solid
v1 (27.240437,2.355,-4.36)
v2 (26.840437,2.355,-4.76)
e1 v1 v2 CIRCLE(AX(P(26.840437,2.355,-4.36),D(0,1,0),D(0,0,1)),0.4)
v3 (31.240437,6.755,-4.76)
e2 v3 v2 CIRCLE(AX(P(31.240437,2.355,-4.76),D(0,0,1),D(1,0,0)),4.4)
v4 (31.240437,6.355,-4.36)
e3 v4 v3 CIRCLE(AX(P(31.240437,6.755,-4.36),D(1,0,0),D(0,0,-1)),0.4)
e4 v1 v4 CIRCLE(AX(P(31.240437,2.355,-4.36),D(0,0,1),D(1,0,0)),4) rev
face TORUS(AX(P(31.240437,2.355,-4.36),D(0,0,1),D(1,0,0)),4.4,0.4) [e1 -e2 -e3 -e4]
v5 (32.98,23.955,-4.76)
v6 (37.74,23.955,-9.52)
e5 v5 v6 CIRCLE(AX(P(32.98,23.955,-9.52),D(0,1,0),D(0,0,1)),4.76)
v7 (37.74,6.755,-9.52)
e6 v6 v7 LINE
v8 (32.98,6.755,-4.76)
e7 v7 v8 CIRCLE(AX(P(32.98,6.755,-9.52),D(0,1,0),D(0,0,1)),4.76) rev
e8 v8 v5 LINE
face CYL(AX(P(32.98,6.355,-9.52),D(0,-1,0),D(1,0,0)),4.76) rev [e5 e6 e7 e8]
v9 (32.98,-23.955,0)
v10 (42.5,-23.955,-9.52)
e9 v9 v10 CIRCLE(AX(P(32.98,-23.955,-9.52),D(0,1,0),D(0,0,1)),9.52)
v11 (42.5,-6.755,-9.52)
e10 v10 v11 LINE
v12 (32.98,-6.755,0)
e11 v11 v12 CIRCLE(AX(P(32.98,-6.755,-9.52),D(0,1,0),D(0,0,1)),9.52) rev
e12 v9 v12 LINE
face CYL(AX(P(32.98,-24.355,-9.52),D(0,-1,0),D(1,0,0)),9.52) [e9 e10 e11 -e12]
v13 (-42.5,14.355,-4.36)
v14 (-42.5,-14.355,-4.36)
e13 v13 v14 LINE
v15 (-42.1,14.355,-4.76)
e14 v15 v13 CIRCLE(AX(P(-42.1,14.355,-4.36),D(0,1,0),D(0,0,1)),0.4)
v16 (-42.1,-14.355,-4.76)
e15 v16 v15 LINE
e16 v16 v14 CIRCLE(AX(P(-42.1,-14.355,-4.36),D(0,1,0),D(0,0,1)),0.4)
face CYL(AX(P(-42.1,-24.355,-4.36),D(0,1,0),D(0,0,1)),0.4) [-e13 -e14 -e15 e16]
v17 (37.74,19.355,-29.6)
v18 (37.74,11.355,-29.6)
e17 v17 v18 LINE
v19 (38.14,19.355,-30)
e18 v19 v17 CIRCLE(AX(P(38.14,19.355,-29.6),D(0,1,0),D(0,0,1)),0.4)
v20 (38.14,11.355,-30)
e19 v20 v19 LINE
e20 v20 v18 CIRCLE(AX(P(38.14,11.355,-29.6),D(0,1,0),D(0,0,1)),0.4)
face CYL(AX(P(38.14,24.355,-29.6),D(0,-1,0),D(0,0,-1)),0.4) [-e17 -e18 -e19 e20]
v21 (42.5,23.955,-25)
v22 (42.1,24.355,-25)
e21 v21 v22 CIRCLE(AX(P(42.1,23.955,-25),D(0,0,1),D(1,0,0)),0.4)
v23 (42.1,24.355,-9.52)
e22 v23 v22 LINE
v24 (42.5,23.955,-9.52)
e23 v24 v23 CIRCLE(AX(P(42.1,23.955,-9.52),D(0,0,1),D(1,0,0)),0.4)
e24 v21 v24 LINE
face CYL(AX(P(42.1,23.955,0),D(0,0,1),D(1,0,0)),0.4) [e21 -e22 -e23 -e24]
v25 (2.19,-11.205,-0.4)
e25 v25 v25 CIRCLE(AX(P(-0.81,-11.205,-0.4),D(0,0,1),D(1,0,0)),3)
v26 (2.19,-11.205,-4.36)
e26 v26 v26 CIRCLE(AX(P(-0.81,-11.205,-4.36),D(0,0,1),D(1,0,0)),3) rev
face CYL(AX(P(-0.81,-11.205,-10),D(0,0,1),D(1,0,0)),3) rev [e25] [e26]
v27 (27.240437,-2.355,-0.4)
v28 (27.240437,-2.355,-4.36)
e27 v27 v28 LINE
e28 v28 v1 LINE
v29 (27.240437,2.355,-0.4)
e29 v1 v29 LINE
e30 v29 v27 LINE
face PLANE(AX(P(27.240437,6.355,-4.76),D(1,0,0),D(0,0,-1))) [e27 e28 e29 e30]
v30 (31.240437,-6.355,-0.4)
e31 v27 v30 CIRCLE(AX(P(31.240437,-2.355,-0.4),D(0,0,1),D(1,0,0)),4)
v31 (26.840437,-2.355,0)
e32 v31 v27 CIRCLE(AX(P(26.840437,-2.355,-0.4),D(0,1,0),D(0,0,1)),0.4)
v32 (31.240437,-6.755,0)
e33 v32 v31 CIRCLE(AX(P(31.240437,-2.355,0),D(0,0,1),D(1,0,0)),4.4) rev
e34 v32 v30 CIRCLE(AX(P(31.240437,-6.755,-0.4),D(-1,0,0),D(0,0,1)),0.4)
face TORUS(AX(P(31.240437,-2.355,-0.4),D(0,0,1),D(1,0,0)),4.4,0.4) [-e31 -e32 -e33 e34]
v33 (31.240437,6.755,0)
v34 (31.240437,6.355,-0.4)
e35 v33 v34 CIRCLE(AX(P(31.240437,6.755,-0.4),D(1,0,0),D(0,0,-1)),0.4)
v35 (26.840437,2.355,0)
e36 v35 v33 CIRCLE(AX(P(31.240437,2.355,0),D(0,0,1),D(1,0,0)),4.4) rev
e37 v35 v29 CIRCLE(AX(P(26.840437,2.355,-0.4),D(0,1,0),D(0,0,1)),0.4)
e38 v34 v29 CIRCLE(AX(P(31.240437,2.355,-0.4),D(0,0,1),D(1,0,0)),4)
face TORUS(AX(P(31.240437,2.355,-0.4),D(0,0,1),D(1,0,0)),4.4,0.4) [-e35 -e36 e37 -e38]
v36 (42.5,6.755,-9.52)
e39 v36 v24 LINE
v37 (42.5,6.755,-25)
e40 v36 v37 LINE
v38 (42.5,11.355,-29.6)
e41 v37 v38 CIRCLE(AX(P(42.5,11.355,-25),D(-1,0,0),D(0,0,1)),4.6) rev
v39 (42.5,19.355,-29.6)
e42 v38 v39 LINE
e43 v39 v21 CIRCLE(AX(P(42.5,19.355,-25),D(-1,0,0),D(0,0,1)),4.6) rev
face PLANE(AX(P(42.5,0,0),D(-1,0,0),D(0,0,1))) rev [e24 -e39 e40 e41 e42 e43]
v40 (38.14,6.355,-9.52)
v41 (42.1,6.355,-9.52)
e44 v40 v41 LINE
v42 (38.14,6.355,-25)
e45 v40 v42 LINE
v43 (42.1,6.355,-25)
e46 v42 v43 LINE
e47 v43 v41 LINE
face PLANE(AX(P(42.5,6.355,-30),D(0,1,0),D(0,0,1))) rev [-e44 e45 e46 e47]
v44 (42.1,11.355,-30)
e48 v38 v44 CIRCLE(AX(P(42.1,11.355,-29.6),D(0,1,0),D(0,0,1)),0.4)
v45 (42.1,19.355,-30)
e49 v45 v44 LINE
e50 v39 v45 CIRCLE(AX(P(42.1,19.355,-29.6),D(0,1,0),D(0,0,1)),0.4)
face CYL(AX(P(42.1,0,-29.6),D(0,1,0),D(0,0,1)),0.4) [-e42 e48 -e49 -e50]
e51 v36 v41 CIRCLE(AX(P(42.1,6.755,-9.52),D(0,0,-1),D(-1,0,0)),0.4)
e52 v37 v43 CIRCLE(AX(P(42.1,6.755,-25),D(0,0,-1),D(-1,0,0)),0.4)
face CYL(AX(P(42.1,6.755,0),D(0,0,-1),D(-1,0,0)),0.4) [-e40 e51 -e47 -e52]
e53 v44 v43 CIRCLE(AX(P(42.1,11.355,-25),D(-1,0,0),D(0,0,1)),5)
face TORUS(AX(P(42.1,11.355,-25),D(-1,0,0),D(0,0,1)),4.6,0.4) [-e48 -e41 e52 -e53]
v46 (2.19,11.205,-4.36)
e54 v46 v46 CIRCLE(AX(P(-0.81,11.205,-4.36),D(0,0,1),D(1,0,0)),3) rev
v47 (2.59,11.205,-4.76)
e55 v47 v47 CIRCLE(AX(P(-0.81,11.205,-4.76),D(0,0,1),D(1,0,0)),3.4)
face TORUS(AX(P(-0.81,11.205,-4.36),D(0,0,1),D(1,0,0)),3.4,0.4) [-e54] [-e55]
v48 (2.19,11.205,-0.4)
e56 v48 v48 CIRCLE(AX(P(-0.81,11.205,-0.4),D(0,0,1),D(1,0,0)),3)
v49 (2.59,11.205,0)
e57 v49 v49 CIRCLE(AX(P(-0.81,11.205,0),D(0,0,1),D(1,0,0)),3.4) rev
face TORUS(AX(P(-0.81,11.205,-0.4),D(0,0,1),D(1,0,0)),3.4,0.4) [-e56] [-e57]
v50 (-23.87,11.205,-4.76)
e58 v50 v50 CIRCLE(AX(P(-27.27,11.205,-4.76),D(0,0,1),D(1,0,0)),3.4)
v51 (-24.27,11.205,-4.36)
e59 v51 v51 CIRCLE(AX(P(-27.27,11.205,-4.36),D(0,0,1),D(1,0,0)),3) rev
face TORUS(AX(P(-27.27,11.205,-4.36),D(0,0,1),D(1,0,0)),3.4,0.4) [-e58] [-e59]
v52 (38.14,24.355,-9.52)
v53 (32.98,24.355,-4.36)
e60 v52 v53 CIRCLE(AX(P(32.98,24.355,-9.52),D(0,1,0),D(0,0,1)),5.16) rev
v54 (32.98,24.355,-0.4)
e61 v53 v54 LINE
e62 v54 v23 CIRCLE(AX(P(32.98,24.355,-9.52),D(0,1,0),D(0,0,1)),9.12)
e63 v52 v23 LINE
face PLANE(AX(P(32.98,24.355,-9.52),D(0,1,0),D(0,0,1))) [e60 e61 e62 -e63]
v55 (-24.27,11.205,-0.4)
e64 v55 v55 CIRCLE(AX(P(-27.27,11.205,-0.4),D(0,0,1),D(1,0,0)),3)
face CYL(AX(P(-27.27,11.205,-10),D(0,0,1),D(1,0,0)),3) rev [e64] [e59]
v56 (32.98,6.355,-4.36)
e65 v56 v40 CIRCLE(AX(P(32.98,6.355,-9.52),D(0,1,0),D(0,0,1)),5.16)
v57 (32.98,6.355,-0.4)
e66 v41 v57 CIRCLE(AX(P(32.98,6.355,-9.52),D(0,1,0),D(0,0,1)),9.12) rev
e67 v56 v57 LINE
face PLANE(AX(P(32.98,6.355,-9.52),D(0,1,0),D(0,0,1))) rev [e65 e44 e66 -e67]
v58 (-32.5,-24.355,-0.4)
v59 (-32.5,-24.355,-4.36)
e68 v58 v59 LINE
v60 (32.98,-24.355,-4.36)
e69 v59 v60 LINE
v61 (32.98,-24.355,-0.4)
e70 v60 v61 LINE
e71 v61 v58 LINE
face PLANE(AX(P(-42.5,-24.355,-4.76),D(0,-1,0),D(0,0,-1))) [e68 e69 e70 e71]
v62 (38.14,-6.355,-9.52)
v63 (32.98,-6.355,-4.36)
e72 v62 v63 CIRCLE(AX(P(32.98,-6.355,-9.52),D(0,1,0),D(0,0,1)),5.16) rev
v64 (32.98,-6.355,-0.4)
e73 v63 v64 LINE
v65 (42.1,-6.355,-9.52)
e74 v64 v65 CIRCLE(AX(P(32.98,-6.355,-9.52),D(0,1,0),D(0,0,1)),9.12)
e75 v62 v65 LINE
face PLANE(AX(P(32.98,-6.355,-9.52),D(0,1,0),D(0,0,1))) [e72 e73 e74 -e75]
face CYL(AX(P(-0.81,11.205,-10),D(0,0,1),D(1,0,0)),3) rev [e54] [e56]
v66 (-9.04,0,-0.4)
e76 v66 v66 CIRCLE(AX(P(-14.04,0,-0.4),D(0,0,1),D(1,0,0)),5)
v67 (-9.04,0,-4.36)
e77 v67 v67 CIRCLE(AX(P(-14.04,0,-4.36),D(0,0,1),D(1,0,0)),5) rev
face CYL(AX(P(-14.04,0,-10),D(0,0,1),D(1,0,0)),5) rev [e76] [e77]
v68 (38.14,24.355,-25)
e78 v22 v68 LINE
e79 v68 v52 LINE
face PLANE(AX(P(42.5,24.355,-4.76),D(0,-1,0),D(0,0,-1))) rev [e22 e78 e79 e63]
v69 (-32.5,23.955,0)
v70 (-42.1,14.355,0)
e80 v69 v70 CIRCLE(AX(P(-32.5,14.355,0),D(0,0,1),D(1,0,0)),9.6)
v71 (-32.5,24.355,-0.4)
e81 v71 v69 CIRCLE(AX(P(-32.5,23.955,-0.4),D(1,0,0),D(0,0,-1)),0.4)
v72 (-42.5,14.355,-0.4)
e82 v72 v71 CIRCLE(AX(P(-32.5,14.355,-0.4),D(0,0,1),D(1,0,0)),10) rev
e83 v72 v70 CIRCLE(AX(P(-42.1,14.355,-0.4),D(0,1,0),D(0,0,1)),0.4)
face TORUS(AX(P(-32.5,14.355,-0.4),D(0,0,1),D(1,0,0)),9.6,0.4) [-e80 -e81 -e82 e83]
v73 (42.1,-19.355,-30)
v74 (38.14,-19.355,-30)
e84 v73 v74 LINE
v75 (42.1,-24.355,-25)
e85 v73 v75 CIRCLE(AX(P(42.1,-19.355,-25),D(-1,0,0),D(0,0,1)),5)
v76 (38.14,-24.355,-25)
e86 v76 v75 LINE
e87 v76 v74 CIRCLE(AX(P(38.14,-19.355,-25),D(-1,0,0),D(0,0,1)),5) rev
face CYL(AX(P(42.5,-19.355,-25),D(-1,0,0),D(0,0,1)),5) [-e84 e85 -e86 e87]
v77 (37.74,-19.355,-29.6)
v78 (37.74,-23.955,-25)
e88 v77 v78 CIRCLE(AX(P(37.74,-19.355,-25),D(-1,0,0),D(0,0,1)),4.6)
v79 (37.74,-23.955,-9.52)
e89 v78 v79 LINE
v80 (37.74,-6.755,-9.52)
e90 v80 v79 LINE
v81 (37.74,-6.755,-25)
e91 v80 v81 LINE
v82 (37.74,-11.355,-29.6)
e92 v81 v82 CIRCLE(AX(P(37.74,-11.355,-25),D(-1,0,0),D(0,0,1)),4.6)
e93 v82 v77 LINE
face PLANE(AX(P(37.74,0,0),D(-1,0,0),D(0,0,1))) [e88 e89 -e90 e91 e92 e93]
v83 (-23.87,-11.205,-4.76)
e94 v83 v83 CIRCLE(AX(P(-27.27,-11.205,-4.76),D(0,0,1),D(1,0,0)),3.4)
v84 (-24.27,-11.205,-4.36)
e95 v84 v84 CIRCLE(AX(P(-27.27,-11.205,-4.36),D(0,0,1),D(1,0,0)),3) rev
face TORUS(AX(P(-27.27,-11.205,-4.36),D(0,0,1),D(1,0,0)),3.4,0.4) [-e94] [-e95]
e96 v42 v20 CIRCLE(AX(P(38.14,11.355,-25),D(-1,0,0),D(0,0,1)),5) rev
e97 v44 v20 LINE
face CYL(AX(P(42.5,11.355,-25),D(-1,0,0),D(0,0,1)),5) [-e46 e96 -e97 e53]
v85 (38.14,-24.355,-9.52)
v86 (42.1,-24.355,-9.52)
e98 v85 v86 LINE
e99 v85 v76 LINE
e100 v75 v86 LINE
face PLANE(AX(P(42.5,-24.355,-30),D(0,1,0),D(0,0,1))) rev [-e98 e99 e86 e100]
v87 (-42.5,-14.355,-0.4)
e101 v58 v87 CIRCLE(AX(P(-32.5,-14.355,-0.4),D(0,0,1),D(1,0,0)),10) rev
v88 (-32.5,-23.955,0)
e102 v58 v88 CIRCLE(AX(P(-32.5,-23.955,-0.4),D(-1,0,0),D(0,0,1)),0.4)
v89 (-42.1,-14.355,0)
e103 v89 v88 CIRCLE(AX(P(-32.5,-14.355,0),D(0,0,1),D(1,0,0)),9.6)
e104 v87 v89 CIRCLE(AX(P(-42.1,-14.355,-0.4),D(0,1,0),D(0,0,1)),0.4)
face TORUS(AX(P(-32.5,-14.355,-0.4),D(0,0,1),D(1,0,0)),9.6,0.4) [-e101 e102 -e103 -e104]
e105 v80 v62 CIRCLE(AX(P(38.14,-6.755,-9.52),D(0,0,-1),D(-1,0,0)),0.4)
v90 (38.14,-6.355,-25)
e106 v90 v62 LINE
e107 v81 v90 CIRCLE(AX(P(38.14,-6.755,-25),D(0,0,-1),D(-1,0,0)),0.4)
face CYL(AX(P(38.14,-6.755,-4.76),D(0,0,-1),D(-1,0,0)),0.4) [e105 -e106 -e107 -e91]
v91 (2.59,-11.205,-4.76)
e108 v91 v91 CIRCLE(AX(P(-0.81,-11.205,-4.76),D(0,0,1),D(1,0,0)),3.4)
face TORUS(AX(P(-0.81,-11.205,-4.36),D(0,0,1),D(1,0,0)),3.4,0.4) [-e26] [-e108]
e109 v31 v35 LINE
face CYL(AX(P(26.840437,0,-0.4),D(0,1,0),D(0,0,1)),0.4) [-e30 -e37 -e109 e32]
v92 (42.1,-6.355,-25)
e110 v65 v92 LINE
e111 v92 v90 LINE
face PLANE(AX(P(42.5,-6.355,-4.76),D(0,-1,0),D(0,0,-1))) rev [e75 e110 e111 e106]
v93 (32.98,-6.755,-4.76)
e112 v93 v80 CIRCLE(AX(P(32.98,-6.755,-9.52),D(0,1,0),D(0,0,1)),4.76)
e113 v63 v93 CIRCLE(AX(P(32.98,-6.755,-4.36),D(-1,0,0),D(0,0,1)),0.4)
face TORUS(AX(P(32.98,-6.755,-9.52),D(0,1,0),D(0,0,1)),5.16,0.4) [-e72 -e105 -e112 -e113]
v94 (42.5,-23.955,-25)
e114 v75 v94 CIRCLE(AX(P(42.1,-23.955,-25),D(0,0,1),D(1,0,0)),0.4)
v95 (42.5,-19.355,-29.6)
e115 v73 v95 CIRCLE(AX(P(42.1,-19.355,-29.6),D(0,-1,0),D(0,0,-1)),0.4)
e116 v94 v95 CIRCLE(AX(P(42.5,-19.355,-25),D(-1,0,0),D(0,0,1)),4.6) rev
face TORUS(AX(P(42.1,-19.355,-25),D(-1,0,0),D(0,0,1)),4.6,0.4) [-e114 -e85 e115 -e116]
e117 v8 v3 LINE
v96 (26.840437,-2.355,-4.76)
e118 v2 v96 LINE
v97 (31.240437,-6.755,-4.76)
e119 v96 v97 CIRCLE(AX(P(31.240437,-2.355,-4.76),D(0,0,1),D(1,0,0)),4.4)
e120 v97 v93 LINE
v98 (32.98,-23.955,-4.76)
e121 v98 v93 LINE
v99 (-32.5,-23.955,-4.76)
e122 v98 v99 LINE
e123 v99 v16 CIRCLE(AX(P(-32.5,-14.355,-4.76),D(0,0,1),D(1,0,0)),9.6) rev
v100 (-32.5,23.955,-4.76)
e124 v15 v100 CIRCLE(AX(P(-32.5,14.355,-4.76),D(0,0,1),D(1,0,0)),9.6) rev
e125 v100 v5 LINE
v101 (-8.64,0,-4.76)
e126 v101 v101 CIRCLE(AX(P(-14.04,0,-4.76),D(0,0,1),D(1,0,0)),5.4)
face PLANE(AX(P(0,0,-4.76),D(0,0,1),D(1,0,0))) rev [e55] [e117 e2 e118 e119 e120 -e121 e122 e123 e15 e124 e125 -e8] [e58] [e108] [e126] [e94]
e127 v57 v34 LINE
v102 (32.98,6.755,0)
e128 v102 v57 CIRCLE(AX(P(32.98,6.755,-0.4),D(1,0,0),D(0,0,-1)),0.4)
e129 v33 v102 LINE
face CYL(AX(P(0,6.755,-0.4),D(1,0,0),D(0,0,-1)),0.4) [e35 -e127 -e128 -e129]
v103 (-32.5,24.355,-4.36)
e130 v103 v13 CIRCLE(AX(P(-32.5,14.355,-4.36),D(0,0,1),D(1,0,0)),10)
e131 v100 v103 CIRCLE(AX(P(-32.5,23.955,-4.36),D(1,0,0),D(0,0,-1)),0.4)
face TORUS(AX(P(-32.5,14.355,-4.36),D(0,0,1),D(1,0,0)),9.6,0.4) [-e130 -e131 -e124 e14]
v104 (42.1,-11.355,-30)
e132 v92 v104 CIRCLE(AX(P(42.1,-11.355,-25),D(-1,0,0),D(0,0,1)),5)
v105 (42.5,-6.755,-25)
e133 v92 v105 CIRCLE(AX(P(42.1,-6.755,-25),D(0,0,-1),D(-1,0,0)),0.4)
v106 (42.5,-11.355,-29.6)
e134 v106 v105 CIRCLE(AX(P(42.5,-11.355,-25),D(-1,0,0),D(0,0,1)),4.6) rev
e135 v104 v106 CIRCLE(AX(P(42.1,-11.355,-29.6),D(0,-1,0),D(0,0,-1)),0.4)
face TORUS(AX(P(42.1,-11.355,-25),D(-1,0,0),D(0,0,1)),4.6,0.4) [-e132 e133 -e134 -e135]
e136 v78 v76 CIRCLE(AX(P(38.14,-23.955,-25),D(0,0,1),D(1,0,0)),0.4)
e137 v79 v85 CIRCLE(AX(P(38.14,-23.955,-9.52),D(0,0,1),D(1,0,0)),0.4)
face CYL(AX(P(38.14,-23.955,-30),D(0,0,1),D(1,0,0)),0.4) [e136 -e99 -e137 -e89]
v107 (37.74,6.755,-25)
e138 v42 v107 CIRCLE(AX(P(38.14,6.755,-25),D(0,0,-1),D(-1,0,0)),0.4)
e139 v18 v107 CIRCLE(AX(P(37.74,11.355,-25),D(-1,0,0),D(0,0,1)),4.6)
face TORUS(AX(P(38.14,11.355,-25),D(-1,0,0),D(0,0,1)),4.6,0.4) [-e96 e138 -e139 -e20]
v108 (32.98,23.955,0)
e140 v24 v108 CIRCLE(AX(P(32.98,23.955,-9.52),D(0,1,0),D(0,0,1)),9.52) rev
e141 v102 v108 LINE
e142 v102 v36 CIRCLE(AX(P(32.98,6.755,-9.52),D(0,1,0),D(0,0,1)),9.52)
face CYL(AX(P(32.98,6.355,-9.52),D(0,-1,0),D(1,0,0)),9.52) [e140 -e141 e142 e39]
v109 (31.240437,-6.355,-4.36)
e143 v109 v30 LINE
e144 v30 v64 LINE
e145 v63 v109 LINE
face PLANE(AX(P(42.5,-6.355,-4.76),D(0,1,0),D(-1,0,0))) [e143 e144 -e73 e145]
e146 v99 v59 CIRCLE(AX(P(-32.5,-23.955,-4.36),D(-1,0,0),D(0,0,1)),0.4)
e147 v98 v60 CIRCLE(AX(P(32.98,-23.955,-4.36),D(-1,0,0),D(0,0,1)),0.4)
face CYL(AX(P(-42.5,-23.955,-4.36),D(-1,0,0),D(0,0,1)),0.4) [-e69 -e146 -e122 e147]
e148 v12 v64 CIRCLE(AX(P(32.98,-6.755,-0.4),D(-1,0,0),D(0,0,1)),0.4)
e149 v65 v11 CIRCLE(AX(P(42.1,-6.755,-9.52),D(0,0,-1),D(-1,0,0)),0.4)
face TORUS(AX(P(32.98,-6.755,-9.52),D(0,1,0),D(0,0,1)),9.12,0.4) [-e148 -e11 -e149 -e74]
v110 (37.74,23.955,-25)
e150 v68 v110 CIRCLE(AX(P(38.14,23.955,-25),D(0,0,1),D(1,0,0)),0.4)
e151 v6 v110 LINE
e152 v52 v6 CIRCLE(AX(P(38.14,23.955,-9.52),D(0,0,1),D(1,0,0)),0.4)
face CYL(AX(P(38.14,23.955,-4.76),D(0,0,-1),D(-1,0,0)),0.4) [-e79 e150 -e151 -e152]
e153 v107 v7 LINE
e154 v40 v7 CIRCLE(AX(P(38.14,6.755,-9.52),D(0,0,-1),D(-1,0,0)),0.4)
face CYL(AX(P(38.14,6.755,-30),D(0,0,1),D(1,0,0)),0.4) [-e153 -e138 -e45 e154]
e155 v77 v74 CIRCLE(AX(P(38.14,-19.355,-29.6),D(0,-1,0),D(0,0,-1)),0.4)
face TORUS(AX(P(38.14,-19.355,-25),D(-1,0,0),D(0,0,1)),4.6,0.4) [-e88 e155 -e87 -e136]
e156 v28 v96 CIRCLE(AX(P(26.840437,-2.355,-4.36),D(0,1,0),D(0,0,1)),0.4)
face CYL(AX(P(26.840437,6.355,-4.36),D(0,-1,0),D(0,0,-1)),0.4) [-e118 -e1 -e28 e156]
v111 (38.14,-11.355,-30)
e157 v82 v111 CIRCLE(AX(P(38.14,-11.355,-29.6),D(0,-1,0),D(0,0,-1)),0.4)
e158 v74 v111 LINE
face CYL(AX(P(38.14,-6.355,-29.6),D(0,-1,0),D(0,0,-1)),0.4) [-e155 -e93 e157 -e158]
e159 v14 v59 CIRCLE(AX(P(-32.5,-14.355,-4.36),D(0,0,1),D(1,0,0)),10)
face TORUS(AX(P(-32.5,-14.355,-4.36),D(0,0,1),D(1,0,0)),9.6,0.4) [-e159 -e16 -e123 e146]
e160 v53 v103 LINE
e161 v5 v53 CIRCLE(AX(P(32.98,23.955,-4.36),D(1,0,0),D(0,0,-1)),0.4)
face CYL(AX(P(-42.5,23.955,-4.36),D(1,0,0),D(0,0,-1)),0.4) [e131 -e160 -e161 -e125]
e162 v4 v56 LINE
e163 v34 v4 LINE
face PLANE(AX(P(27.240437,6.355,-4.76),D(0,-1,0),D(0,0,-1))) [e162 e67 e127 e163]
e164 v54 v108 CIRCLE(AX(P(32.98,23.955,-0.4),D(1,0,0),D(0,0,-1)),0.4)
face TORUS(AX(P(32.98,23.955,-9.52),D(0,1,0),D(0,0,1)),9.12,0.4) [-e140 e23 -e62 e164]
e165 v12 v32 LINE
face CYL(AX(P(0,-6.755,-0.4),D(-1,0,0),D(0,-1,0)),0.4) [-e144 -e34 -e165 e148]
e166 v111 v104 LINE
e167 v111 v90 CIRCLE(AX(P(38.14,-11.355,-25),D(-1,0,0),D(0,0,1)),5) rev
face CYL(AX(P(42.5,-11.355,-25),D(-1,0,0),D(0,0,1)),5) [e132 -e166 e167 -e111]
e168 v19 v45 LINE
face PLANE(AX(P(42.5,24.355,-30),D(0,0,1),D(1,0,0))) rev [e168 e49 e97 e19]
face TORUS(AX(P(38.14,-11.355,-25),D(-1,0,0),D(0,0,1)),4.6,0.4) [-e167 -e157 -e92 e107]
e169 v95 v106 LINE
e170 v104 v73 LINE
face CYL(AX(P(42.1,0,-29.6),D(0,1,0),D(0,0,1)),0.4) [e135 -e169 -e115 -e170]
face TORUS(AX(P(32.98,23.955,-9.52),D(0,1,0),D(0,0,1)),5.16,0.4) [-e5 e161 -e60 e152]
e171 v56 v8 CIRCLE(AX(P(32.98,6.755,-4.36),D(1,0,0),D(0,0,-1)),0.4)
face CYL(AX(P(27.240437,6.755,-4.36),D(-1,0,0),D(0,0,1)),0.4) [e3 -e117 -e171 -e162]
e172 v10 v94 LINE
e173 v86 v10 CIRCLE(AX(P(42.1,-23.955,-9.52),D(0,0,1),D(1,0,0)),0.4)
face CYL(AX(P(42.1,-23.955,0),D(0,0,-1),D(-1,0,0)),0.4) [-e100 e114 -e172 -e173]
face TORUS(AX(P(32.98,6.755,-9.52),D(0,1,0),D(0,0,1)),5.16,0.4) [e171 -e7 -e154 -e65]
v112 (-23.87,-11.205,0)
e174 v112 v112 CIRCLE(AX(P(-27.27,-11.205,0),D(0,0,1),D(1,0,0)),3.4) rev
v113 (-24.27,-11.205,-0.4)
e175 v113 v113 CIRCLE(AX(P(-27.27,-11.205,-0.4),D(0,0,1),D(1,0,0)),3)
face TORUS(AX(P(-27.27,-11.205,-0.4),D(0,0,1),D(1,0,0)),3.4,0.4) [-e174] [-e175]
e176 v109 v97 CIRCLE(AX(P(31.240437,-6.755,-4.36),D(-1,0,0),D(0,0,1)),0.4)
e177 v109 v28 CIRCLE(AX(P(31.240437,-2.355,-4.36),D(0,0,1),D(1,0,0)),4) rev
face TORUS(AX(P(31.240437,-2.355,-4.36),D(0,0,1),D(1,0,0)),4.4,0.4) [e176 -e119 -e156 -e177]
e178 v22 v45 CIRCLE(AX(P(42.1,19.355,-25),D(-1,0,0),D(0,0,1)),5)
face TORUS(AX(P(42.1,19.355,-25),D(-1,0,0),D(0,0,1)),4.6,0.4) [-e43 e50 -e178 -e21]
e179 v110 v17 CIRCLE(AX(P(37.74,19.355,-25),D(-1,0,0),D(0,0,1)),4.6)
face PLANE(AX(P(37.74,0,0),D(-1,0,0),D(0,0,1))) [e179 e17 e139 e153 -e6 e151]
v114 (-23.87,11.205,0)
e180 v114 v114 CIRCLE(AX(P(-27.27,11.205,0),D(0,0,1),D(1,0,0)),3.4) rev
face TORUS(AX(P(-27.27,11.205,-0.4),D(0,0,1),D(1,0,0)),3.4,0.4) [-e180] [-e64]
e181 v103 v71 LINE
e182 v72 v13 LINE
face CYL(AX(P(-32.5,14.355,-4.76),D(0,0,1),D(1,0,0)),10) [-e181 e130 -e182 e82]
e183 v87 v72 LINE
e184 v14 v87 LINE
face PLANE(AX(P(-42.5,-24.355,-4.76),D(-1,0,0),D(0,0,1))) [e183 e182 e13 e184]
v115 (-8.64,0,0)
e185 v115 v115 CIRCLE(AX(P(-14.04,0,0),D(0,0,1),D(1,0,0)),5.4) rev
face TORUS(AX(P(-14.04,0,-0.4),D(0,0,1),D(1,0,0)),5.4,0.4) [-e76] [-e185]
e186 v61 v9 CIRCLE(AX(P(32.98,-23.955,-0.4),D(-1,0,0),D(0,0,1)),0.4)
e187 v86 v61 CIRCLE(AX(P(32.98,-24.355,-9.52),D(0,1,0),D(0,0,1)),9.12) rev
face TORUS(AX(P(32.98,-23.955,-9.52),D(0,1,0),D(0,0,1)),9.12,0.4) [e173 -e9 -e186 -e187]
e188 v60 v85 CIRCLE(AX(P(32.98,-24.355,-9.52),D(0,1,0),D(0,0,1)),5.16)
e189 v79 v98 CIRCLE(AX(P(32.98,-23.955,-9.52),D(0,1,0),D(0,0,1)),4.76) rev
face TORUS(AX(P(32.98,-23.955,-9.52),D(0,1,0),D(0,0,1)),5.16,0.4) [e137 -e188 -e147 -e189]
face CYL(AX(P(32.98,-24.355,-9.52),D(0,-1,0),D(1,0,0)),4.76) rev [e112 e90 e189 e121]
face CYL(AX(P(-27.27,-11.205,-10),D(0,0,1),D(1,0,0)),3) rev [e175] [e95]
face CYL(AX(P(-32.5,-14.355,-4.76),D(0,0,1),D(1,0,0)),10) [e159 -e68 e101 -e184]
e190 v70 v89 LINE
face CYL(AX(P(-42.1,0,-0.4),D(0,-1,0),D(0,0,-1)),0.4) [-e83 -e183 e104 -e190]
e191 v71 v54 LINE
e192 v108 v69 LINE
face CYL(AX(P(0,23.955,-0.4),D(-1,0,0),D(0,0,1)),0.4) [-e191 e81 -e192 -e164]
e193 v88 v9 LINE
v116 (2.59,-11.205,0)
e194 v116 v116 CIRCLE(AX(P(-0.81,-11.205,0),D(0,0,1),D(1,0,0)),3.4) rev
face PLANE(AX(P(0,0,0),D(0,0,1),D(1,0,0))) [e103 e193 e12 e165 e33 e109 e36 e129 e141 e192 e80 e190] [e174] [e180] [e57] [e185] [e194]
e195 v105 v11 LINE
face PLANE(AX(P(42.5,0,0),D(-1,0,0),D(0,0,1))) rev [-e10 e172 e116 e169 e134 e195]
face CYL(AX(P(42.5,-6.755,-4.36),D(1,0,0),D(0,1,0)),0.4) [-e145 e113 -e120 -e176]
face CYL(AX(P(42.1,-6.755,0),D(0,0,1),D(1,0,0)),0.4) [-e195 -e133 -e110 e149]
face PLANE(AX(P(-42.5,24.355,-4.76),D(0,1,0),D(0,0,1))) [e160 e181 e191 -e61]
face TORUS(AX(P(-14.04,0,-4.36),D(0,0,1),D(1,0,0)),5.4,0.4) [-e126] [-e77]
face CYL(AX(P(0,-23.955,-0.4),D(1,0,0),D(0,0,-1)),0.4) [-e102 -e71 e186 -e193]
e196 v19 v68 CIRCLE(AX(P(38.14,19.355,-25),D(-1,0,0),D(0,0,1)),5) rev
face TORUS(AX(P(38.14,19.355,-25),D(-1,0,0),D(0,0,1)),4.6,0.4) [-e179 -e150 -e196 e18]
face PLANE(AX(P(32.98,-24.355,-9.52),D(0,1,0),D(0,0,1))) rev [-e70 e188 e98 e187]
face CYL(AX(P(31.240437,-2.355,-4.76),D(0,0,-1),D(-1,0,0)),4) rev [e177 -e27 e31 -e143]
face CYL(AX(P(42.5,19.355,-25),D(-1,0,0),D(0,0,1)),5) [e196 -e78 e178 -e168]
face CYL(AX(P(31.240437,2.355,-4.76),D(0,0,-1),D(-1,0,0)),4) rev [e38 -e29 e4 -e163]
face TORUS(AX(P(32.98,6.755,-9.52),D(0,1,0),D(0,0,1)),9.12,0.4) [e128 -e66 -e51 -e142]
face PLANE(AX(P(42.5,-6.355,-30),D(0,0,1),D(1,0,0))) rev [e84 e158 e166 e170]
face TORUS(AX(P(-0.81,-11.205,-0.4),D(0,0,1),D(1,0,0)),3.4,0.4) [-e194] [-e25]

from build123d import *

# Parameters (mm, degrees)
BASE_FLANGE2_DEPTH             = 4.76
FILLET1_R                      = 4
FILLET2_R                      = 10
EDGE_FLANGE1_STRIP_W           = 28.56
EDGE_FLANGE1_STRIP_H           = 4.76
EDGE_FLANGE1_STRIP_CUT_DEPTH   = 18
EDGE_FLANGE1_STRIP_2_W         = 28.56
EDGE_FLANGE1_STRIP_2_H         = 4.76
EDGE_FLANGE1_STRIP_CUT_2_DEPTH = 18
EDGE_FLANGE1_DEPTH             = 18
EDGE_FLANGE1_BEND_DEPTH        = 18
FILLET3_R                      = 5
SKETCH16_R                     = 3
SKETCH16_R_2                   = 5
CUT_EXTRUDE2_DEPTH             = 10
FILLET4_R                      = 0.4
FILLET5_R                      = 0.4


# Sheet-metal steps are written as plain solids
with BuildPart() as part:
    # Sketch1 → Base-Flange2 (new body)
    with BuildSketch(Plane.XY):
        Polygon((27.240436749, 6.355), (42.5, 6.355), (42.5, 24.355), (-42.5, 24.355), (-42.5, -24.355), (42.5, -24.355), (42.5, -6.355), (27.240436749, -6.355), align=None)
    extrude(amount=-BASE_FLANGE2_DEPTH)

    # Fillet1
    fillet1_edges = [part.edges().sort_by_distance(p)[0] for p in [
        (27.240436749, 6.355, -2.38),
        (27.240436749, -6.355, -2.38),
    ]]
    fillet(fillet1_edges, radius=FILLET1_R)

    # Fillet2
    fillet2_edges = [part.edges().sort_by_distance(p)[0] for p in [
        (-42.5, -24.355, -2.38),
        (-42.5, 24.355, -2.38),
    ]]
    fillet(fillet2_edges, radius=FILLET2_R)

    # Edge-Flange1 strip (across the edge) → Edge-Flange1 strip cut (cut)
    with BuildSketch(Plane(origin=(42.5, 24.355, -4.76), x_dir=(-1, 0, 0), z_dir=(0, -1, 0))):
        with Locations((-4.76, -2.38)):
            Rectangle(EDGE_FLANGE1_STRIP_W, EDGE_FLANGE1_STRIP_H)
    extrude(amount=EDGE_FLANGE1_STRIP_CUT_DEPTH, mode=Mode.SUBTRACT)

    # Edge-Flange1 strip 2 (across the edge) → Edge-Flange1 strip cut 2 (cut)
    with BuildSketch(Plane(origin=(42.5, -6.355, -4.76), x_dir=(-1, 0, 0), z_dir=(0, -1, 0))):
        with Locations((-4.76, -2.38)):
            Rectangle(EDGE_FLANGE1_STRIP_2_W, EDGE_FLANGE1_STRIP_2_H)
    extrude(amount=EDGE_FLANGE1_STRIP_CUT_2_DEPTH, mode=Mode.SUBTRACT)

    # Edge-Flange1 section (across the edge) → Edge-Flange1 (add)
    with BuildSketch(Plane(origin=(42.5, 24.355, -4.76), x_dir=(-1, 0, 0), z_dir=(0, -1, 0))):
        with BuildLine():
            Line((0, 4.76), (0, 25.24))
            Line((0, 25.24), (4.76, 25.24))
            Line((4.76, 25.24), (4.76, 4.76))
            ThreePointArc((4.76, 4.76), (6.154171722, 1.394171722), (9.52, 0))
            Line((9.52, 0), (9.52, -4.76))
            ThreePointArc((9.52, -4.76), (2.788343443, -1.971656557), (0, 4.76))
        make_face()
    extrude(amount=EDGE_FLANGE1_DEPTH)

    # Edge-Flange1 section 2 (across the edge) → Edge-Flange1 bend (add)
    with BuildSketch(Plane(origin=(42.5, -6.355, -4.76), x_dir=(-1, 0, 0), z_dir=(0, -1, 0))):
        with BuildLine():
            Line((0, 4.76), (0, 25.24))
            Line((0, 25.24), (4.76, 25.24))
            Line((4.76, 25.24), (4.76, 4.76))
            ThreePointArc((4.76, 4.76), (6.154171722, 1.394171722), (9.52, 0))
            Line((9.52, 0), (9.52, -4.76))
            ThreePointArc((9.52, -4.76), (2.788343443, -1.971656557), (0, 4.76))
        make_face()
    extrude(amount=EDGE_FLANGE1_BEND_DEPTH)

    # Fillet3
    fillet3_edges = [part.edges().sort_by_distance(p)[0] for p in [
        (40.12, -6.355, -30),
        (40.12, -24.355, -30),
        (40.12, 24.355, -30),
        (40.12, 6.355, -30),
    ]]
    fillet(fillet3_edges, radius=FILLET3_R)

    # Sketch16 → Cut-Extrude2 (cut)
    with BuildSketch(Plane.XY):
        with BuildLine():
            Line((-27.27, 8.205), (-27.27, 11.205))
            Line((-27.27, 11.205), (-24.27, 11.205))
            ThreePointArc((-24.27, 11.205), (-29.391320344, 13.326320344), (-27.27, 8.205))
        make_face()
        with BuildLine():
            Line((-24.27, 11.205), (-27.27, 11.205))
            Line((-27.27, 11.205), (-27.27, 8.205))
            ThreePointArc((-27.27, 8.205), (-25.148679656, 9.083679656), (-24.27, 11.205))
        make_face()
        with Locations((-0.81, 11.205)):
            Circle(SKETCH16_R)
        with Locations((-0.81, -11.205)):
            Circle(SKETCH16_R)
        with Locations((-27.27, -11.205)):
            Circle(SKETCH16_R)
        with Locations((-14.04, 0)):
            Circle(SKETCH16_R_2)
    extrude(amount=-CUT_EXTRUDE2_DEPTH, mode=Mode.SUBTRACT)

    # Fillet4
    fillet4_edges = [part.edges().sort_by_distance(p)[0] for p in [
        (-19.04, 0, -4.76),
        (-19.04, 0, 0),
        (-30.27, -11.205, 0),
        (-30.27, -11.205, -4.76),
        (-3.81, -11.205, -4.76),
        (-3.81, -11.205, 0),
        (-3.81, 11.205, 0),
        (-3.81, 11.205, -4.76),
        (-27.27, 14.205, -4.76),
        (-27.27, 14.205, 0),
    ]]
    fillet(fillet4_edges, radius=FILLET4_R)

    # Fillet5
    fillet5_edges = [part.edges().sort_by_distance(p)[0] for p in [
        (39.711656557, -6.355, -2.788343443),
        (39.711656557, -24.355, -2.788343443),
        (36.345828278, -6.355, -6.154171722),
        (36.345828278, -24.355, -6.154171722),
        (37.74, -24.355, -17.26),
        (42.5, -24.355, -17.26),
        (37.74, -15.355, -30),
        (42.5, -15.355, -30),
        (37.74, -6.355, -17.26),
        (37.74, -7.819466094, -28.535533906),
        (37.74, -22.890533906, -28.535533906),
        (42.5, -6.355, -17.26),
        (42.5, -7.819466094, -28.535533906),
        (42.5, -22.890533906, -28.535533906),
        (37.74, 15.355, -30),
        (42.5, 15.355, -30),
        (37.74, 24.355, -17.26),
        (37.74, 22.890533906, -28.535533906),
        (37.74, 7.819466094, -28.535533906),
        (42.5, 24.355, -17.26),
        (42.5, 22.890533906, -28.535533906),
        (42.5, 7.819466094, -28.535533906),
        (27.240436749, 0, 0),
        (27.240436749, 0, -4.76),
        (32.110218374, 6.355, 0),
        (32.110218374, 6.355, -4.76),
        (28.412009624, -5.183427125, 0),
        (28.412009624, -5.183427125, -4.76),
        (28.412009624, 5.183427125, 0),
        (28.412009624, 5.183427125, -4.76),
        (-42.5, 0, 0),
        (-42.5, 0, -4.76),
        (0.24, -24.355, 0),
        (-39.571067812, 21.426067812, 0),
        (-39.571067812, -21.426067812, 0),
        (0.24, -24.355, -4.76),
        (-39.571067812, 21.426067812, -4.76),
        (-39.571067812, -21.426067812, -4.76),
        (0.24, 24.355, 0),
        (0.24, 24.355, -4.76),
        (32.110218374, -6.355, -4.76),
        (32.110218374, -6.355, 0),
        (39.711656557, 24.355, -2.788343443),
        (39.711656557, 6.355, -2.788343443),
        (36.345828278, 24.355, -6.154171722),
        (36.345828278, 6.355, -6.154171722),
        (37.74, 6.355, -17.26),
        (42.5, 6.355, -17.26),
    ]]
    fillet(fillet5_edges, radius=FILLET5_R)


solid = part.part
